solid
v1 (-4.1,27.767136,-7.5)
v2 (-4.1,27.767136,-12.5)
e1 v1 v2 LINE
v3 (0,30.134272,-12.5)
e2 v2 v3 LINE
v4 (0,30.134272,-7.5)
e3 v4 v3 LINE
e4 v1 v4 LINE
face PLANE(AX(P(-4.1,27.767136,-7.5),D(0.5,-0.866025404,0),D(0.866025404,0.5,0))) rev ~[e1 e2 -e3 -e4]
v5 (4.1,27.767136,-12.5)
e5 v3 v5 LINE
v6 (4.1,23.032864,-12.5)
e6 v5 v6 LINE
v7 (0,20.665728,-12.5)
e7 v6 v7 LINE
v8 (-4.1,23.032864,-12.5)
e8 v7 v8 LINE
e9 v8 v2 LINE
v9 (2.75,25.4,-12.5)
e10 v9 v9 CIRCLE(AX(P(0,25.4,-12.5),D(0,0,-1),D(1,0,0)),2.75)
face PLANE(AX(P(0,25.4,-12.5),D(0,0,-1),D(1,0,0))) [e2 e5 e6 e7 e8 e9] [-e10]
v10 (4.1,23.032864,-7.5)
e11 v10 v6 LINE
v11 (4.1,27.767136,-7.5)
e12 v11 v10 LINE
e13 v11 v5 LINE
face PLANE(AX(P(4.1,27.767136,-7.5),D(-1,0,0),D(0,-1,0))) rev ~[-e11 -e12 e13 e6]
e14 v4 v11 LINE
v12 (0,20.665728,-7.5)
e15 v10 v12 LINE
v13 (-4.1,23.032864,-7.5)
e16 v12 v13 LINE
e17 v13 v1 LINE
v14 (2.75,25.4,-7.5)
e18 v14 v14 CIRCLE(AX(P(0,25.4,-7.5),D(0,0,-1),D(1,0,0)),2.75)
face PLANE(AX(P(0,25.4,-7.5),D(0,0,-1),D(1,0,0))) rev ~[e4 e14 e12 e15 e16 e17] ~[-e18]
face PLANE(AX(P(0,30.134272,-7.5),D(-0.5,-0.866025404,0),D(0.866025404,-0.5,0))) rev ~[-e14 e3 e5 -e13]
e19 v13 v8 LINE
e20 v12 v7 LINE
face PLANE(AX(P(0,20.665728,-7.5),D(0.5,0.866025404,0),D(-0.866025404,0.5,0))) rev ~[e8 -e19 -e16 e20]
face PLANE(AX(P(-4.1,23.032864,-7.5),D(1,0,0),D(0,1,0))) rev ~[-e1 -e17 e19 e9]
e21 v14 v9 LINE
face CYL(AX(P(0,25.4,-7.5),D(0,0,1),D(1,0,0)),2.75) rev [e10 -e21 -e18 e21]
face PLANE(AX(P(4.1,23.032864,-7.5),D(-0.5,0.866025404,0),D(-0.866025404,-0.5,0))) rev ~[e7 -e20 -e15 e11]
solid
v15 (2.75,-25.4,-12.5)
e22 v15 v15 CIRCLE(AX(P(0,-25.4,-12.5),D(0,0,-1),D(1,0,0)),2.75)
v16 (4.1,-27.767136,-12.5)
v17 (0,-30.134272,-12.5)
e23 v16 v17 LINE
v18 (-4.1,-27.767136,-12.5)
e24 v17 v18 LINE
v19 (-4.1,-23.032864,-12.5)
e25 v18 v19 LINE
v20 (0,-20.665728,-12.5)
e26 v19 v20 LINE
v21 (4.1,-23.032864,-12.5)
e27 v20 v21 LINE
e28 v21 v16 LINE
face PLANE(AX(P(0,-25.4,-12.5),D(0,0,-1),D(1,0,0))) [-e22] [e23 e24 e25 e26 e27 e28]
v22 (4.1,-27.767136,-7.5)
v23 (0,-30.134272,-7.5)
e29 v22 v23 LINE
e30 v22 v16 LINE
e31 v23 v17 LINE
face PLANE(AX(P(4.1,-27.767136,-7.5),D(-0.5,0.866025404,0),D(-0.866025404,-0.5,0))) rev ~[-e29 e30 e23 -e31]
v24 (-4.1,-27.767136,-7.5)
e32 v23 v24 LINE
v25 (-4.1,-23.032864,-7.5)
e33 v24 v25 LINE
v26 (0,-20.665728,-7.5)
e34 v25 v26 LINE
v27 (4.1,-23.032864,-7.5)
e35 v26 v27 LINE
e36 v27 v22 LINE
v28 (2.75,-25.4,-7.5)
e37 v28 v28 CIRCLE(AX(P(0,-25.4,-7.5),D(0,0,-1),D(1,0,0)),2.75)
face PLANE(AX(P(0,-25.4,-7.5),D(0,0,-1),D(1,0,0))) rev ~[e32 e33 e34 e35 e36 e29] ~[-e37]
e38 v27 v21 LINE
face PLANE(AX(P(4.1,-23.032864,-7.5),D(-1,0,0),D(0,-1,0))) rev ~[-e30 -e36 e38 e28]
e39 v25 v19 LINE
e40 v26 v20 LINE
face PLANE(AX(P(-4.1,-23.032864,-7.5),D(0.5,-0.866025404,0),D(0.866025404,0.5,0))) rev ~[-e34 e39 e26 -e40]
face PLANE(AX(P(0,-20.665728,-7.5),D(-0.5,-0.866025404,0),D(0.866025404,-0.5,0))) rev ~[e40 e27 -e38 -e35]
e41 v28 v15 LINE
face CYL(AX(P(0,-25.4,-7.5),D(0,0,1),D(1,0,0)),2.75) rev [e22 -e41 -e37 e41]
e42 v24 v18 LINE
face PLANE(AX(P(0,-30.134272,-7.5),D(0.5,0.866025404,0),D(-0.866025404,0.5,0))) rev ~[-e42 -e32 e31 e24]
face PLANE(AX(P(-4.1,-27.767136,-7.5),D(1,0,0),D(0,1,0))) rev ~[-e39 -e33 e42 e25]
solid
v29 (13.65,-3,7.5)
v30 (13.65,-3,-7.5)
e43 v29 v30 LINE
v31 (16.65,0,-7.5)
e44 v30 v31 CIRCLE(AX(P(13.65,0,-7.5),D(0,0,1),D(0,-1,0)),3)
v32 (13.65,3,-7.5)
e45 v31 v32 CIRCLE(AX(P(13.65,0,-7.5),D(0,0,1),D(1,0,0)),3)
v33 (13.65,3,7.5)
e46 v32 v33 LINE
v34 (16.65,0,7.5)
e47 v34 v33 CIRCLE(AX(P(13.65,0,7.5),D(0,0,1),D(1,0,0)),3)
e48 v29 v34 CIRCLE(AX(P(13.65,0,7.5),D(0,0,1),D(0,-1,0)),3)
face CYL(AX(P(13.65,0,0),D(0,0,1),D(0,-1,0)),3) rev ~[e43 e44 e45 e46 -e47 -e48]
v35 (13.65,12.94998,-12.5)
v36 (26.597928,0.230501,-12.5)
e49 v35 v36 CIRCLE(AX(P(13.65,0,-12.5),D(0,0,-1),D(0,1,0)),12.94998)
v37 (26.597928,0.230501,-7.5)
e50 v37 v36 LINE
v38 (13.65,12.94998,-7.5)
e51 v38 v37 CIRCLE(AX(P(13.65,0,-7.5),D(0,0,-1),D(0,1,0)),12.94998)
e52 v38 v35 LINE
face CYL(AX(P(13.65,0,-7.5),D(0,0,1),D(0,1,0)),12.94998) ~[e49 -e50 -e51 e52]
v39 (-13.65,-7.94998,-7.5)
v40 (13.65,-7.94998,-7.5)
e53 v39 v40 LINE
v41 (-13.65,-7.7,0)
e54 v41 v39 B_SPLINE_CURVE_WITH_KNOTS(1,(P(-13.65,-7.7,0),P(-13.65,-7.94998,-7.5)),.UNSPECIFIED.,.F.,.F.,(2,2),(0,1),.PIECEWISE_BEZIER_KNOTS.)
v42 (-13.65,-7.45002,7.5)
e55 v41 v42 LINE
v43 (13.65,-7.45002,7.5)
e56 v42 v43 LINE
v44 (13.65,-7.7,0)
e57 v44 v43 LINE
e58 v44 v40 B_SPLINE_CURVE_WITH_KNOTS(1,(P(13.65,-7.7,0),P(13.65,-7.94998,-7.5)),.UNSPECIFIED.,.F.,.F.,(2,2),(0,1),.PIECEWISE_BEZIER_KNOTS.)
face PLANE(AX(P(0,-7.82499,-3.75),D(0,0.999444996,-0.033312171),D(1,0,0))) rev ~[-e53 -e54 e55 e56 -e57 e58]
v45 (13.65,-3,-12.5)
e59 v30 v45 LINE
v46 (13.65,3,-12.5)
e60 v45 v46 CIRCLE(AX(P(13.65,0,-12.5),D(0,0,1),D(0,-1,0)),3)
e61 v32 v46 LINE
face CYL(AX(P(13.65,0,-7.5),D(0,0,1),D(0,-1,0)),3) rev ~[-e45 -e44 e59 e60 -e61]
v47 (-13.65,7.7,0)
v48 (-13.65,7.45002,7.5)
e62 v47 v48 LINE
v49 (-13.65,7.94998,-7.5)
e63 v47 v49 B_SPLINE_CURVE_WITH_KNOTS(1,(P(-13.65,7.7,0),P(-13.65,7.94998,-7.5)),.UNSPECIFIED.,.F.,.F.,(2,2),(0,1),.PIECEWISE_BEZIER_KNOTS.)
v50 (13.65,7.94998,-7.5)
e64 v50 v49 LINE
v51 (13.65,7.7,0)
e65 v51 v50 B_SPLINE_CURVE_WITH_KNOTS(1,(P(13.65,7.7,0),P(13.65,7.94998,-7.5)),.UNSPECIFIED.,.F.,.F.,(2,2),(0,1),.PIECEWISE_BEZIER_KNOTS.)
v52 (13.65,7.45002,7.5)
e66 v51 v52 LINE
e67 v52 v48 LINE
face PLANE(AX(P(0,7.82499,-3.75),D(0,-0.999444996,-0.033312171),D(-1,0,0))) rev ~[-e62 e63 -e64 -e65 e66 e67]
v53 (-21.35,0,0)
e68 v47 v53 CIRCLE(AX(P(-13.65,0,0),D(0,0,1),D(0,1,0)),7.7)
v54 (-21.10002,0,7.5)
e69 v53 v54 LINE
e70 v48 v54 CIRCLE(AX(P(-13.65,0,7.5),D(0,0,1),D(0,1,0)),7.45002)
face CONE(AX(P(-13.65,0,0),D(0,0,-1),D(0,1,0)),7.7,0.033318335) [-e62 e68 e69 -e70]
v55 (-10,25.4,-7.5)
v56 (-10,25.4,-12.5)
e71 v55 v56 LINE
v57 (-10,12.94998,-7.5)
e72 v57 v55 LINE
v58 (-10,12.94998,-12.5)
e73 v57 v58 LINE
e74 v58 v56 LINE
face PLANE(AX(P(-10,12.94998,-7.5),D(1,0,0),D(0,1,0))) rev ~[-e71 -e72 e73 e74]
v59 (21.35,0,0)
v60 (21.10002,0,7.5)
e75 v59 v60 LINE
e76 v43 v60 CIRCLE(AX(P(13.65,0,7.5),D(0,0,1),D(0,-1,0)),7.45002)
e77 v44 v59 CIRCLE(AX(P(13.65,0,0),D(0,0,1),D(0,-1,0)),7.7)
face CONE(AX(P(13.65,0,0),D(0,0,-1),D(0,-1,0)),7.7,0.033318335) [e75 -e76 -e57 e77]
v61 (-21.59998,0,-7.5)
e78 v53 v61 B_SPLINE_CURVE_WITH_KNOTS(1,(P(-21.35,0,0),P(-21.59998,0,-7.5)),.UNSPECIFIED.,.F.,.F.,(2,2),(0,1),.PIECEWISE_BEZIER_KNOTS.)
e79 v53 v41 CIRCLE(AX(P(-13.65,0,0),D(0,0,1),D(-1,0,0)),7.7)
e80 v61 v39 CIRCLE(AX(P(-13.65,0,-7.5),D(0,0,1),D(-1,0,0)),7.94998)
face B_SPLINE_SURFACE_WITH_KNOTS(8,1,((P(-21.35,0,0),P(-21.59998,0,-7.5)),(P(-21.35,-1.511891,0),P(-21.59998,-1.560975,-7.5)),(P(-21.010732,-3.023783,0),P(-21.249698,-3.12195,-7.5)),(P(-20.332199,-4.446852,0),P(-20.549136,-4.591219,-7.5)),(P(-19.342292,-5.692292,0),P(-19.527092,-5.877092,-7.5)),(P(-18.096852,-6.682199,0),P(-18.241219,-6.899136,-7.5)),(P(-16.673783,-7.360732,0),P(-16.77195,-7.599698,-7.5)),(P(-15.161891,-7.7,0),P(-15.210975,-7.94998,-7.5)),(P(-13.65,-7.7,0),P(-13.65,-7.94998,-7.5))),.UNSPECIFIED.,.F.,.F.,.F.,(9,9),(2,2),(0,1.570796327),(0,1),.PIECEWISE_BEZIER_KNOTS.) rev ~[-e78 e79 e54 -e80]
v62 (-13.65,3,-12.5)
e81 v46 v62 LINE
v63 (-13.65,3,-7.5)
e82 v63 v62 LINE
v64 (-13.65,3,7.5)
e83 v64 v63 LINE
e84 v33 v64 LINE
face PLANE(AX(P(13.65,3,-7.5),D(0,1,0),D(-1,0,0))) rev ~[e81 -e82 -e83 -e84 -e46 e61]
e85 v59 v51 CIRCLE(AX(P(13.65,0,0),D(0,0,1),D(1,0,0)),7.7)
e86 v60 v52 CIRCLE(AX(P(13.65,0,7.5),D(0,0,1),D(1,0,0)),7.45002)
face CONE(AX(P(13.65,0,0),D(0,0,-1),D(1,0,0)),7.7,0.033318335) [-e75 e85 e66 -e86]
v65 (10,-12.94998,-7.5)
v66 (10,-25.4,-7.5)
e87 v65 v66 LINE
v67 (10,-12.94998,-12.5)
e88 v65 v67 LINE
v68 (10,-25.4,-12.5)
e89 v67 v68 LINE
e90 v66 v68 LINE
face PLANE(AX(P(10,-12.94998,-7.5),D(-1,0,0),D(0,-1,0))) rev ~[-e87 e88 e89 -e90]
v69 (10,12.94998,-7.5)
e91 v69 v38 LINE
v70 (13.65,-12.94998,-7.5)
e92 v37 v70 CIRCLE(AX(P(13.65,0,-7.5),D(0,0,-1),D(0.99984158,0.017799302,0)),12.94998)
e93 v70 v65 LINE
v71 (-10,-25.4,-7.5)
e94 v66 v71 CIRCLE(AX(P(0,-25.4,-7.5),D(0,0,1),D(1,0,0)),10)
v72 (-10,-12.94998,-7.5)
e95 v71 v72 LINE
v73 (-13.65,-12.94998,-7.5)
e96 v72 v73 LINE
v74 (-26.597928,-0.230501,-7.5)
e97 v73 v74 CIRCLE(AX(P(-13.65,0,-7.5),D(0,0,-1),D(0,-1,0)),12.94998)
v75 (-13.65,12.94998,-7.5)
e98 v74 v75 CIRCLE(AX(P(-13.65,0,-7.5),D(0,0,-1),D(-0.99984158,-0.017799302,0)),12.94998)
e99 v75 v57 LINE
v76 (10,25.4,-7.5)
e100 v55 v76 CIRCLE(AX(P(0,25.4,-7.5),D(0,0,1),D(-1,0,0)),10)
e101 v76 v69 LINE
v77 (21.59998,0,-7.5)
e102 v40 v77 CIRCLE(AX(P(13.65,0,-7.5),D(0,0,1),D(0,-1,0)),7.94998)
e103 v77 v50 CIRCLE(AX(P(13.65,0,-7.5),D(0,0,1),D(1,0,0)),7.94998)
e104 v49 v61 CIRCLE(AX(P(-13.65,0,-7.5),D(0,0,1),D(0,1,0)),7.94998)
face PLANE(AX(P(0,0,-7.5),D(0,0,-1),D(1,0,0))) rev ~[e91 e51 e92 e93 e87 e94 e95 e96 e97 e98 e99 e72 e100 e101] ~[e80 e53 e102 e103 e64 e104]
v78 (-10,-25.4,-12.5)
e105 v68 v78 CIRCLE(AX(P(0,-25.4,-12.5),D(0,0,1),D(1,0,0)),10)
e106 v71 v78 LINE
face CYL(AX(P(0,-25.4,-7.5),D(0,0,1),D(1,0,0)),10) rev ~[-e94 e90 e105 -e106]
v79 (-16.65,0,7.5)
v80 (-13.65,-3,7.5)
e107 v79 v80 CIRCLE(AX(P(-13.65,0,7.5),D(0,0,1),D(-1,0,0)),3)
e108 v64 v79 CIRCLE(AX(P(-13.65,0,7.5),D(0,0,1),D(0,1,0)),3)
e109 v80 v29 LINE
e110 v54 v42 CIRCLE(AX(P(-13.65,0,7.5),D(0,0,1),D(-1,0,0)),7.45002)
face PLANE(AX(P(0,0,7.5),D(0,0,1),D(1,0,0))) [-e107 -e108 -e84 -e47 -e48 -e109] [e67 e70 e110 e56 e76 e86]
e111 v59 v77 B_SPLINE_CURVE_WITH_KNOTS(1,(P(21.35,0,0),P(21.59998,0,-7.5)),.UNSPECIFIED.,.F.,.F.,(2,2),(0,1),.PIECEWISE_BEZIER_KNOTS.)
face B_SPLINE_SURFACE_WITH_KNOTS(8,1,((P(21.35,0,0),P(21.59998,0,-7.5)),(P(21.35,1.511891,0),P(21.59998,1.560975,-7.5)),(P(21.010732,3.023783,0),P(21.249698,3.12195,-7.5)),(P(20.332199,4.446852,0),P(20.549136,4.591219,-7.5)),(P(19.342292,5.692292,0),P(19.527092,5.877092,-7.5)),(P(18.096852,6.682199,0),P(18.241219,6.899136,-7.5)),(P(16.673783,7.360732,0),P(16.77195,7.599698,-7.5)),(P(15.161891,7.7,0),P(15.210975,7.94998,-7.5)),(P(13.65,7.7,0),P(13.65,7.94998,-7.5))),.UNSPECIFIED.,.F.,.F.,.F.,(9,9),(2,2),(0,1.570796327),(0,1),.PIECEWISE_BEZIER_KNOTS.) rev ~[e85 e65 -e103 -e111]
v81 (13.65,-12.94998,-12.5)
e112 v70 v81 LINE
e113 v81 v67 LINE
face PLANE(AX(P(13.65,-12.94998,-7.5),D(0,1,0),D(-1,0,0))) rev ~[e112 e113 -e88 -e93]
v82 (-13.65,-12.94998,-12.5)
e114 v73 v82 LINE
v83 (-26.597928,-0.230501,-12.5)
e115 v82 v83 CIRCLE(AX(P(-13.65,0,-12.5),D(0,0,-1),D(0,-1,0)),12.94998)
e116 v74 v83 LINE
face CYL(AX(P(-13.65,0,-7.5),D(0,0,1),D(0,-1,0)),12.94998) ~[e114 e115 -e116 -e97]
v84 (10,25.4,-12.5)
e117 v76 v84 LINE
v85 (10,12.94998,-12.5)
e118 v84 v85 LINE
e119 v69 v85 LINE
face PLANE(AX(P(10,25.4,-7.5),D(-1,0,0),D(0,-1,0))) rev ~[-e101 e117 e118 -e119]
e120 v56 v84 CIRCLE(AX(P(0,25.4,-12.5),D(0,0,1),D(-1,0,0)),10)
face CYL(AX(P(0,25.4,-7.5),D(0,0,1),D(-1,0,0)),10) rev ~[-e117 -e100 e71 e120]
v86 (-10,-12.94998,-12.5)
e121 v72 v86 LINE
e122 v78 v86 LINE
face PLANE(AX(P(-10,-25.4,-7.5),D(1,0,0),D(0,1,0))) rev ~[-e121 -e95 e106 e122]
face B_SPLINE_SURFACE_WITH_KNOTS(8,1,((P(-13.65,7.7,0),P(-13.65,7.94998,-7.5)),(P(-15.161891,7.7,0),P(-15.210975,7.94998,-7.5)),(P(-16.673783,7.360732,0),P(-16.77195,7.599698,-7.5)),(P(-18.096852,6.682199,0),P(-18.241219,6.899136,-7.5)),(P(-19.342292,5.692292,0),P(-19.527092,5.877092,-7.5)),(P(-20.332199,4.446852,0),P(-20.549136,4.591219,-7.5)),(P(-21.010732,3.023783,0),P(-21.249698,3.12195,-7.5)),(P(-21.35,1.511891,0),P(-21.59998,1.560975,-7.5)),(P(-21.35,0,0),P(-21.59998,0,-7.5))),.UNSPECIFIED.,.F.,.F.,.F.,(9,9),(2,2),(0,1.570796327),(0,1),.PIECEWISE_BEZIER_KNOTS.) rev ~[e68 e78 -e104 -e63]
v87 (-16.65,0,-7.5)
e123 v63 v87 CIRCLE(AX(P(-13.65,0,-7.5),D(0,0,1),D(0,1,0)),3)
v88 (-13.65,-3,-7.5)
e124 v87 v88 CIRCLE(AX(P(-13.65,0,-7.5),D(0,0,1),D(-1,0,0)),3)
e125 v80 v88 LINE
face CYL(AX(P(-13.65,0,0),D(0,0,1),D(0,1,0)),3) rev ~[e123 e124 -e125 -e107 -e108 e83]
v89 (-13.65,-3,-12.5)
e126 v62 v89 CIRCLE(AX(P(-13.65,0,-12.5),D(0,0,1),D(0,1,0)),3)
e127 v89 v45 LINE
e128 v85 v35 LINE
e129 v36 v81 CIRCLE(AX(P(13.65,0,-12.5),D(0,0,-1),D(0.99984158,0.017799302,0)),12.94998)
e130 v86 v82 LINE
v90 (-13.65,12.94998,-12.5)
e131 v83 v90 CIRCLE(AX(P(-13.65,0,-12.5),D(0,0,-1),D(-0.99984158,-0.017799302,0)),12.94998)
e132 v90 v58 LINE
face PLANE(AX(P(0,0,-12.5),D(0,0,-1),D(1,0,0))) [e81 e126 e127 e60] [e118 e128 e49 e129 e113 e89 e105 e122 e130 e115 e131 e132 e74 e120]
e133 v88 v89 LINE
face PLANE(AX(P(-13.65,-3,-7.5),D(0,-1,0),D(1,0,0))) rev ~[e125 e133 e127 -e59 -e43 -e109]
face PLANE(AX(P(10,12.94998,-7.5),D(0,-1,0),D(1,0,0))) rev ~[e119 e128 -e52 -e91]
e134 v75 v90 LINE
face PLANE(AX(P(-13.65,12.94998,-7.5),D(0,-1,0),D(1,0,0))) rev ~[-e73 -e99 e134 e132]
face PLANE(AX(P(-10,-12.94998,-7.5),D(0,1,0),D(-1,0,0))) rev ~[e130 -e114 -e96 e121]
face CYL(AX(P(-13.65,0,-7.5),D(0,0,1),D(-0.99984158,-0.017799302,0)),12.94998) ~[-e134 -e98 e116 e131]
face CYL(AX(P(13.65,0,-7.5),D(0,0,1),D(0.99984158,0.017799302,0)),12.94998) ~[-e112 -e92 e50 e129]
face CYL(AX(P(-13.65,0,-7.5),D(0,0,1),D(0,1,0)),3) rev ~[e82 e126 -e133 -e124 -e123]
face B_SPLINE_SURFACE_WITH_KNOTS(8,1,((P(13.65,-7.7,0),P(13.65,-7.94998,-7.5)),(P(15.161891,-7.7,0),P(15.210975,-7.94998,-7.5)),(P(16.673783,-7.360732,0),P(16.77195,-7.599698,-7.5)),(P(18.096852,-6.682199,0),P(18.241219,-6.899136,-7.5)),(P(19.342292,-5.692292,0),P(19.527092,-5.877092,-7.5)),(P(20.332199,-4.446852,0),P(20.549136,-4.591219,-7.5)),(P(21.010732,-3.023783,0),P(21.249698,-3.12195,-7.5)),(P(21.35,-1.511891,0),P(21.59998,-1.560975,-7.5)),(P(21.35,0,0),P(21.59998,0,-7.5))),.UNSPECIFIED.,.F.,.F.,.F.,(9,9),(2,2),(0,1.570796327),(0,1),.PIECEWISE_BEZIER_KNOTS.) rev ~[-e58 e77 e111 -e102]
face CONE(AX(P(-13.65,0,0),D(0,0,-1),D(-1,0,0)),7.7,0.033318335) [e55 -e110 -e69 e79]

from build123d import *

# Parameters (mm, degrees)
F2_DEPTH      = 7.5
F2_TAPER      = 1.909
F2_DEPTH_BACK = 7.5
F2_TAPER_BACK = -1.909
F3_DEPTH      = 7.5
F3_DEPTH_BACK = 7.5
F5_DEPTH      = 5
F4_R          = 2.75


# Not quite as in the source:
# - a feature of the source that left no trace in its solid (it failed there, or was rolled back) is left out
# - a feature names something its author has since deleted; it is built from what else it names


with BuildPart() as f2:
    # F0 (on Top) → F2 (new body, two sides)
    with BuildSketch(Plane.XY) as f2_sk:
        with BuildLine():
            Line((13.65, 7.7), (-13.65, 7.7))
            ThreePointArc((-13.65, 7.7), (-19.0947222151, 5.4447222151), (-21.35, 0))
            ThreePointArc((-21.35, 0), (-19.0947222151, -5.4447222151), (-13.65, -7.7))
            Line((-13.65, -7.7), (13.65, -7.7))
            ThreePointArc((13.65, -7.7), (19.0947222151, -5.4447222151), (21.35, 0))
            ThreePointArc((21.35, 0), (19.0947222151, 5.4447222151), (13.65, 7.7))
        make_face()
    extrude(amount=F2_DEPTH, taper=F2_TAPER)
    extrude(f2_sk.sketch, amount=-F2_DEPTH_BACK, taper=F2_TAPER_BACK)

    # F1 (on Top) → F3 (cut, two sides)
    with BuildSketch(Plane.XY) as f3_sk:
        with BuildLine():
            Line((13.65, 3), (-13.65, 3))
            ThreePointArc((-13.65, 3), (-15.7713203436, 2.1213203436), (-16.65, 0))
            ThreePointArc((-16.65, 0), (-15.7713203436, -2.1213203436), (-13.65, -3))
            Line((-13.65, -3), (13.65, -3))
            ThreePointArc((13.65, -3), (15.7713203436, -2.1213203436), (16.65, 0))
            ThreePointArc((16.65, 0), (15.7713203436, 2.1213203436), (13.65, 3))
        make_face()
    extrude(amount=F3_DEPTH, mode=Mode.SUBTRACT)
    extrude(f3_sk.sketch, amount=-F3_DEPTH_BACK, mode=Mode.SUBTRACT)

    # F4 (on face) → F5 (join)
    with BuildSketch(Plane(origin=(0, 0, -7.5), x_dir=(1, 0, 0), z_dir=(0, 0, -1))):
        with BuildLine():
            Line((-10, 12.9499800244), (-13.65, 12.9499800244))
            ThreePointArc((-13.65, 12.9499800244), (-22.7251585222, 9.2381535184), (-26.597928487, 0.2305006046))
            ThreePointArc((-26.597928487, 0.2305006046), (-22.8881535184, -9.0751585222), (-13.65, -12.9499800244))
            Line((-13.65, -12.9499800244), (-10, -12.9499800244))
            Line((-10, -12.9499800244), (10, -12.9499800244))
            Line((10, -12.9499800244), (13.65, -12.9499800244))
            ThreePointArc((13.65, -12.9499800244), (22.7251585222, -9.2381535184), (26.597928487, -0.2305006046))
            ThreePointArc((26.597928487, -0.2305006046), (22.8881535184, 9.0751585222), (13.65, 12.9499800244))
            Line((13.65, 12.9499800244), (10, 12.9499800244))
            Line((10, 12.9499800244), (-10, 12.9499800244))
        make_face()
        with BuildLine():
            Line((13.65, -7.9499800244), (-13.65, -7.9499800244))
            ThreePointArc((-13.65, -7.9499800244), (-19.2714847855, -5.6214847855), (-21.5999800244, 0))
            ThreePointArc((-21.5999800244, 0), (-19.2714847855, 5.6214847855), (-13.65, 7.9499800244))
            Line((-13.65, 7.9499800244), (13.65, 7.9499800244))
            ThreePointArc((13.65, 7.9499800244), (19.2714847855, 5.6214847855), (21.5999800244, 0))
            ThreePointArc((21.5999800244, 0), (19.2714847855, -5.6214847855), (13.65, -7.9499800244))
        make_face(mode=Mode.SUBTRACT)
        with BuildLine():
            ThreePointArc((-21.5999800244, 0), (-19.2714847855, -5.6214847855), (-13.65, -7.9499800244))
            Line((-13.65, -7.9499800244), (13.65, -7.9499800244))
            ThreePointArc((13.65, -7.9499800244), (19.2714847855, -5.6214847855), (21.5999800244, 0))
            ThreePointArc((21.5999800244, 0), (19.2714847855, 5.6214847855), (13.65, 7.9499800244))
            Line((13.65, 7.9499800244), (-13.65, 7.9499800244))
            ThreePointArc((-13.65, 7.9499800244), (-19.2714847855, 5.6214847855), (-21.5999800244, 0))
        make_face()
        with BuildLine():
            ThreePointArc((13.65, 3), (16.65, 0), (13.65, -3))
            Line((13.65, -3), (-13.65, -3))
            ThreePointArc((-13.65, -3), (-16.65, 0), (-13.65, 3))
            Line((-13.65, 3), (13.65, 3))
        make_face(mode=Mode.SUBTRACT)
        with BuildLine():
            Line((-10, 25.4), (-10, 12.9499800244))
            Line((-10, 12.9499800244), (10, 12.9499800244))
            Line((10, 12.9499800244), (10, 25.4))
            ThreePointArc((10, 25.4), (0, 15.4), (-10, 25.4))
        make_face()
        with BuildLine():
            Line((10, -12.9499800244), (-10, -12.9499800244))
            Line((-10, -12.9499800244), (-10, -25.4))
            ThreePointArc((-10, -25.4), (0, -15.4), (10, -25.4))
            Line((10, -25.4), (10, -12.9499800244))
        make_face()
    extrude(amount=F5_DEPTH)


with BuildPart() as f5:
    # F4 (on face) → F5, piece 2 (new body)
    with BuildSketch(Plane(origin=(0, 0, -7.5), x_dir=(1, 0, 0), z_dir=(0, 0, -1))):
        Polygon((4.1, -23.0328638963), (0, -20.6657277926), (-4.1, -23.0328638963), (-4.1, -27.7671361037), (0, -30.1342722074), (4.1, -27.7671361037), align=None)
        with Locations((0, -25.4)):
            Circle(F4_R, mode=Mode.SUBTRACT)
    extrude(amount=F5_DEPTH)


with BuildPart() as f5b:
    # F4 (on face) → F5, piece 3 (new body)
    with BuildSketch(Plane(origin=(0, 0, -7.5), x_dir=(1, 0, 0), z_dir=(0, 0, -1))):
        Polygon((4.1, 23.0328638963), (4.1, 27.7671361037), (0, 30.1342722074), (-4.1, 27.7671361037), (-4.1, 23.0328638963), (0, 20.6657277926), align=None)
        with Locations((0, 25.4)):
            Circle(F4_R, mode=Mode.SUBTRACT)
    extrude(amount=F5_DEPTH)


solid = Compound([f2.part, f5.part, f5b.part])
